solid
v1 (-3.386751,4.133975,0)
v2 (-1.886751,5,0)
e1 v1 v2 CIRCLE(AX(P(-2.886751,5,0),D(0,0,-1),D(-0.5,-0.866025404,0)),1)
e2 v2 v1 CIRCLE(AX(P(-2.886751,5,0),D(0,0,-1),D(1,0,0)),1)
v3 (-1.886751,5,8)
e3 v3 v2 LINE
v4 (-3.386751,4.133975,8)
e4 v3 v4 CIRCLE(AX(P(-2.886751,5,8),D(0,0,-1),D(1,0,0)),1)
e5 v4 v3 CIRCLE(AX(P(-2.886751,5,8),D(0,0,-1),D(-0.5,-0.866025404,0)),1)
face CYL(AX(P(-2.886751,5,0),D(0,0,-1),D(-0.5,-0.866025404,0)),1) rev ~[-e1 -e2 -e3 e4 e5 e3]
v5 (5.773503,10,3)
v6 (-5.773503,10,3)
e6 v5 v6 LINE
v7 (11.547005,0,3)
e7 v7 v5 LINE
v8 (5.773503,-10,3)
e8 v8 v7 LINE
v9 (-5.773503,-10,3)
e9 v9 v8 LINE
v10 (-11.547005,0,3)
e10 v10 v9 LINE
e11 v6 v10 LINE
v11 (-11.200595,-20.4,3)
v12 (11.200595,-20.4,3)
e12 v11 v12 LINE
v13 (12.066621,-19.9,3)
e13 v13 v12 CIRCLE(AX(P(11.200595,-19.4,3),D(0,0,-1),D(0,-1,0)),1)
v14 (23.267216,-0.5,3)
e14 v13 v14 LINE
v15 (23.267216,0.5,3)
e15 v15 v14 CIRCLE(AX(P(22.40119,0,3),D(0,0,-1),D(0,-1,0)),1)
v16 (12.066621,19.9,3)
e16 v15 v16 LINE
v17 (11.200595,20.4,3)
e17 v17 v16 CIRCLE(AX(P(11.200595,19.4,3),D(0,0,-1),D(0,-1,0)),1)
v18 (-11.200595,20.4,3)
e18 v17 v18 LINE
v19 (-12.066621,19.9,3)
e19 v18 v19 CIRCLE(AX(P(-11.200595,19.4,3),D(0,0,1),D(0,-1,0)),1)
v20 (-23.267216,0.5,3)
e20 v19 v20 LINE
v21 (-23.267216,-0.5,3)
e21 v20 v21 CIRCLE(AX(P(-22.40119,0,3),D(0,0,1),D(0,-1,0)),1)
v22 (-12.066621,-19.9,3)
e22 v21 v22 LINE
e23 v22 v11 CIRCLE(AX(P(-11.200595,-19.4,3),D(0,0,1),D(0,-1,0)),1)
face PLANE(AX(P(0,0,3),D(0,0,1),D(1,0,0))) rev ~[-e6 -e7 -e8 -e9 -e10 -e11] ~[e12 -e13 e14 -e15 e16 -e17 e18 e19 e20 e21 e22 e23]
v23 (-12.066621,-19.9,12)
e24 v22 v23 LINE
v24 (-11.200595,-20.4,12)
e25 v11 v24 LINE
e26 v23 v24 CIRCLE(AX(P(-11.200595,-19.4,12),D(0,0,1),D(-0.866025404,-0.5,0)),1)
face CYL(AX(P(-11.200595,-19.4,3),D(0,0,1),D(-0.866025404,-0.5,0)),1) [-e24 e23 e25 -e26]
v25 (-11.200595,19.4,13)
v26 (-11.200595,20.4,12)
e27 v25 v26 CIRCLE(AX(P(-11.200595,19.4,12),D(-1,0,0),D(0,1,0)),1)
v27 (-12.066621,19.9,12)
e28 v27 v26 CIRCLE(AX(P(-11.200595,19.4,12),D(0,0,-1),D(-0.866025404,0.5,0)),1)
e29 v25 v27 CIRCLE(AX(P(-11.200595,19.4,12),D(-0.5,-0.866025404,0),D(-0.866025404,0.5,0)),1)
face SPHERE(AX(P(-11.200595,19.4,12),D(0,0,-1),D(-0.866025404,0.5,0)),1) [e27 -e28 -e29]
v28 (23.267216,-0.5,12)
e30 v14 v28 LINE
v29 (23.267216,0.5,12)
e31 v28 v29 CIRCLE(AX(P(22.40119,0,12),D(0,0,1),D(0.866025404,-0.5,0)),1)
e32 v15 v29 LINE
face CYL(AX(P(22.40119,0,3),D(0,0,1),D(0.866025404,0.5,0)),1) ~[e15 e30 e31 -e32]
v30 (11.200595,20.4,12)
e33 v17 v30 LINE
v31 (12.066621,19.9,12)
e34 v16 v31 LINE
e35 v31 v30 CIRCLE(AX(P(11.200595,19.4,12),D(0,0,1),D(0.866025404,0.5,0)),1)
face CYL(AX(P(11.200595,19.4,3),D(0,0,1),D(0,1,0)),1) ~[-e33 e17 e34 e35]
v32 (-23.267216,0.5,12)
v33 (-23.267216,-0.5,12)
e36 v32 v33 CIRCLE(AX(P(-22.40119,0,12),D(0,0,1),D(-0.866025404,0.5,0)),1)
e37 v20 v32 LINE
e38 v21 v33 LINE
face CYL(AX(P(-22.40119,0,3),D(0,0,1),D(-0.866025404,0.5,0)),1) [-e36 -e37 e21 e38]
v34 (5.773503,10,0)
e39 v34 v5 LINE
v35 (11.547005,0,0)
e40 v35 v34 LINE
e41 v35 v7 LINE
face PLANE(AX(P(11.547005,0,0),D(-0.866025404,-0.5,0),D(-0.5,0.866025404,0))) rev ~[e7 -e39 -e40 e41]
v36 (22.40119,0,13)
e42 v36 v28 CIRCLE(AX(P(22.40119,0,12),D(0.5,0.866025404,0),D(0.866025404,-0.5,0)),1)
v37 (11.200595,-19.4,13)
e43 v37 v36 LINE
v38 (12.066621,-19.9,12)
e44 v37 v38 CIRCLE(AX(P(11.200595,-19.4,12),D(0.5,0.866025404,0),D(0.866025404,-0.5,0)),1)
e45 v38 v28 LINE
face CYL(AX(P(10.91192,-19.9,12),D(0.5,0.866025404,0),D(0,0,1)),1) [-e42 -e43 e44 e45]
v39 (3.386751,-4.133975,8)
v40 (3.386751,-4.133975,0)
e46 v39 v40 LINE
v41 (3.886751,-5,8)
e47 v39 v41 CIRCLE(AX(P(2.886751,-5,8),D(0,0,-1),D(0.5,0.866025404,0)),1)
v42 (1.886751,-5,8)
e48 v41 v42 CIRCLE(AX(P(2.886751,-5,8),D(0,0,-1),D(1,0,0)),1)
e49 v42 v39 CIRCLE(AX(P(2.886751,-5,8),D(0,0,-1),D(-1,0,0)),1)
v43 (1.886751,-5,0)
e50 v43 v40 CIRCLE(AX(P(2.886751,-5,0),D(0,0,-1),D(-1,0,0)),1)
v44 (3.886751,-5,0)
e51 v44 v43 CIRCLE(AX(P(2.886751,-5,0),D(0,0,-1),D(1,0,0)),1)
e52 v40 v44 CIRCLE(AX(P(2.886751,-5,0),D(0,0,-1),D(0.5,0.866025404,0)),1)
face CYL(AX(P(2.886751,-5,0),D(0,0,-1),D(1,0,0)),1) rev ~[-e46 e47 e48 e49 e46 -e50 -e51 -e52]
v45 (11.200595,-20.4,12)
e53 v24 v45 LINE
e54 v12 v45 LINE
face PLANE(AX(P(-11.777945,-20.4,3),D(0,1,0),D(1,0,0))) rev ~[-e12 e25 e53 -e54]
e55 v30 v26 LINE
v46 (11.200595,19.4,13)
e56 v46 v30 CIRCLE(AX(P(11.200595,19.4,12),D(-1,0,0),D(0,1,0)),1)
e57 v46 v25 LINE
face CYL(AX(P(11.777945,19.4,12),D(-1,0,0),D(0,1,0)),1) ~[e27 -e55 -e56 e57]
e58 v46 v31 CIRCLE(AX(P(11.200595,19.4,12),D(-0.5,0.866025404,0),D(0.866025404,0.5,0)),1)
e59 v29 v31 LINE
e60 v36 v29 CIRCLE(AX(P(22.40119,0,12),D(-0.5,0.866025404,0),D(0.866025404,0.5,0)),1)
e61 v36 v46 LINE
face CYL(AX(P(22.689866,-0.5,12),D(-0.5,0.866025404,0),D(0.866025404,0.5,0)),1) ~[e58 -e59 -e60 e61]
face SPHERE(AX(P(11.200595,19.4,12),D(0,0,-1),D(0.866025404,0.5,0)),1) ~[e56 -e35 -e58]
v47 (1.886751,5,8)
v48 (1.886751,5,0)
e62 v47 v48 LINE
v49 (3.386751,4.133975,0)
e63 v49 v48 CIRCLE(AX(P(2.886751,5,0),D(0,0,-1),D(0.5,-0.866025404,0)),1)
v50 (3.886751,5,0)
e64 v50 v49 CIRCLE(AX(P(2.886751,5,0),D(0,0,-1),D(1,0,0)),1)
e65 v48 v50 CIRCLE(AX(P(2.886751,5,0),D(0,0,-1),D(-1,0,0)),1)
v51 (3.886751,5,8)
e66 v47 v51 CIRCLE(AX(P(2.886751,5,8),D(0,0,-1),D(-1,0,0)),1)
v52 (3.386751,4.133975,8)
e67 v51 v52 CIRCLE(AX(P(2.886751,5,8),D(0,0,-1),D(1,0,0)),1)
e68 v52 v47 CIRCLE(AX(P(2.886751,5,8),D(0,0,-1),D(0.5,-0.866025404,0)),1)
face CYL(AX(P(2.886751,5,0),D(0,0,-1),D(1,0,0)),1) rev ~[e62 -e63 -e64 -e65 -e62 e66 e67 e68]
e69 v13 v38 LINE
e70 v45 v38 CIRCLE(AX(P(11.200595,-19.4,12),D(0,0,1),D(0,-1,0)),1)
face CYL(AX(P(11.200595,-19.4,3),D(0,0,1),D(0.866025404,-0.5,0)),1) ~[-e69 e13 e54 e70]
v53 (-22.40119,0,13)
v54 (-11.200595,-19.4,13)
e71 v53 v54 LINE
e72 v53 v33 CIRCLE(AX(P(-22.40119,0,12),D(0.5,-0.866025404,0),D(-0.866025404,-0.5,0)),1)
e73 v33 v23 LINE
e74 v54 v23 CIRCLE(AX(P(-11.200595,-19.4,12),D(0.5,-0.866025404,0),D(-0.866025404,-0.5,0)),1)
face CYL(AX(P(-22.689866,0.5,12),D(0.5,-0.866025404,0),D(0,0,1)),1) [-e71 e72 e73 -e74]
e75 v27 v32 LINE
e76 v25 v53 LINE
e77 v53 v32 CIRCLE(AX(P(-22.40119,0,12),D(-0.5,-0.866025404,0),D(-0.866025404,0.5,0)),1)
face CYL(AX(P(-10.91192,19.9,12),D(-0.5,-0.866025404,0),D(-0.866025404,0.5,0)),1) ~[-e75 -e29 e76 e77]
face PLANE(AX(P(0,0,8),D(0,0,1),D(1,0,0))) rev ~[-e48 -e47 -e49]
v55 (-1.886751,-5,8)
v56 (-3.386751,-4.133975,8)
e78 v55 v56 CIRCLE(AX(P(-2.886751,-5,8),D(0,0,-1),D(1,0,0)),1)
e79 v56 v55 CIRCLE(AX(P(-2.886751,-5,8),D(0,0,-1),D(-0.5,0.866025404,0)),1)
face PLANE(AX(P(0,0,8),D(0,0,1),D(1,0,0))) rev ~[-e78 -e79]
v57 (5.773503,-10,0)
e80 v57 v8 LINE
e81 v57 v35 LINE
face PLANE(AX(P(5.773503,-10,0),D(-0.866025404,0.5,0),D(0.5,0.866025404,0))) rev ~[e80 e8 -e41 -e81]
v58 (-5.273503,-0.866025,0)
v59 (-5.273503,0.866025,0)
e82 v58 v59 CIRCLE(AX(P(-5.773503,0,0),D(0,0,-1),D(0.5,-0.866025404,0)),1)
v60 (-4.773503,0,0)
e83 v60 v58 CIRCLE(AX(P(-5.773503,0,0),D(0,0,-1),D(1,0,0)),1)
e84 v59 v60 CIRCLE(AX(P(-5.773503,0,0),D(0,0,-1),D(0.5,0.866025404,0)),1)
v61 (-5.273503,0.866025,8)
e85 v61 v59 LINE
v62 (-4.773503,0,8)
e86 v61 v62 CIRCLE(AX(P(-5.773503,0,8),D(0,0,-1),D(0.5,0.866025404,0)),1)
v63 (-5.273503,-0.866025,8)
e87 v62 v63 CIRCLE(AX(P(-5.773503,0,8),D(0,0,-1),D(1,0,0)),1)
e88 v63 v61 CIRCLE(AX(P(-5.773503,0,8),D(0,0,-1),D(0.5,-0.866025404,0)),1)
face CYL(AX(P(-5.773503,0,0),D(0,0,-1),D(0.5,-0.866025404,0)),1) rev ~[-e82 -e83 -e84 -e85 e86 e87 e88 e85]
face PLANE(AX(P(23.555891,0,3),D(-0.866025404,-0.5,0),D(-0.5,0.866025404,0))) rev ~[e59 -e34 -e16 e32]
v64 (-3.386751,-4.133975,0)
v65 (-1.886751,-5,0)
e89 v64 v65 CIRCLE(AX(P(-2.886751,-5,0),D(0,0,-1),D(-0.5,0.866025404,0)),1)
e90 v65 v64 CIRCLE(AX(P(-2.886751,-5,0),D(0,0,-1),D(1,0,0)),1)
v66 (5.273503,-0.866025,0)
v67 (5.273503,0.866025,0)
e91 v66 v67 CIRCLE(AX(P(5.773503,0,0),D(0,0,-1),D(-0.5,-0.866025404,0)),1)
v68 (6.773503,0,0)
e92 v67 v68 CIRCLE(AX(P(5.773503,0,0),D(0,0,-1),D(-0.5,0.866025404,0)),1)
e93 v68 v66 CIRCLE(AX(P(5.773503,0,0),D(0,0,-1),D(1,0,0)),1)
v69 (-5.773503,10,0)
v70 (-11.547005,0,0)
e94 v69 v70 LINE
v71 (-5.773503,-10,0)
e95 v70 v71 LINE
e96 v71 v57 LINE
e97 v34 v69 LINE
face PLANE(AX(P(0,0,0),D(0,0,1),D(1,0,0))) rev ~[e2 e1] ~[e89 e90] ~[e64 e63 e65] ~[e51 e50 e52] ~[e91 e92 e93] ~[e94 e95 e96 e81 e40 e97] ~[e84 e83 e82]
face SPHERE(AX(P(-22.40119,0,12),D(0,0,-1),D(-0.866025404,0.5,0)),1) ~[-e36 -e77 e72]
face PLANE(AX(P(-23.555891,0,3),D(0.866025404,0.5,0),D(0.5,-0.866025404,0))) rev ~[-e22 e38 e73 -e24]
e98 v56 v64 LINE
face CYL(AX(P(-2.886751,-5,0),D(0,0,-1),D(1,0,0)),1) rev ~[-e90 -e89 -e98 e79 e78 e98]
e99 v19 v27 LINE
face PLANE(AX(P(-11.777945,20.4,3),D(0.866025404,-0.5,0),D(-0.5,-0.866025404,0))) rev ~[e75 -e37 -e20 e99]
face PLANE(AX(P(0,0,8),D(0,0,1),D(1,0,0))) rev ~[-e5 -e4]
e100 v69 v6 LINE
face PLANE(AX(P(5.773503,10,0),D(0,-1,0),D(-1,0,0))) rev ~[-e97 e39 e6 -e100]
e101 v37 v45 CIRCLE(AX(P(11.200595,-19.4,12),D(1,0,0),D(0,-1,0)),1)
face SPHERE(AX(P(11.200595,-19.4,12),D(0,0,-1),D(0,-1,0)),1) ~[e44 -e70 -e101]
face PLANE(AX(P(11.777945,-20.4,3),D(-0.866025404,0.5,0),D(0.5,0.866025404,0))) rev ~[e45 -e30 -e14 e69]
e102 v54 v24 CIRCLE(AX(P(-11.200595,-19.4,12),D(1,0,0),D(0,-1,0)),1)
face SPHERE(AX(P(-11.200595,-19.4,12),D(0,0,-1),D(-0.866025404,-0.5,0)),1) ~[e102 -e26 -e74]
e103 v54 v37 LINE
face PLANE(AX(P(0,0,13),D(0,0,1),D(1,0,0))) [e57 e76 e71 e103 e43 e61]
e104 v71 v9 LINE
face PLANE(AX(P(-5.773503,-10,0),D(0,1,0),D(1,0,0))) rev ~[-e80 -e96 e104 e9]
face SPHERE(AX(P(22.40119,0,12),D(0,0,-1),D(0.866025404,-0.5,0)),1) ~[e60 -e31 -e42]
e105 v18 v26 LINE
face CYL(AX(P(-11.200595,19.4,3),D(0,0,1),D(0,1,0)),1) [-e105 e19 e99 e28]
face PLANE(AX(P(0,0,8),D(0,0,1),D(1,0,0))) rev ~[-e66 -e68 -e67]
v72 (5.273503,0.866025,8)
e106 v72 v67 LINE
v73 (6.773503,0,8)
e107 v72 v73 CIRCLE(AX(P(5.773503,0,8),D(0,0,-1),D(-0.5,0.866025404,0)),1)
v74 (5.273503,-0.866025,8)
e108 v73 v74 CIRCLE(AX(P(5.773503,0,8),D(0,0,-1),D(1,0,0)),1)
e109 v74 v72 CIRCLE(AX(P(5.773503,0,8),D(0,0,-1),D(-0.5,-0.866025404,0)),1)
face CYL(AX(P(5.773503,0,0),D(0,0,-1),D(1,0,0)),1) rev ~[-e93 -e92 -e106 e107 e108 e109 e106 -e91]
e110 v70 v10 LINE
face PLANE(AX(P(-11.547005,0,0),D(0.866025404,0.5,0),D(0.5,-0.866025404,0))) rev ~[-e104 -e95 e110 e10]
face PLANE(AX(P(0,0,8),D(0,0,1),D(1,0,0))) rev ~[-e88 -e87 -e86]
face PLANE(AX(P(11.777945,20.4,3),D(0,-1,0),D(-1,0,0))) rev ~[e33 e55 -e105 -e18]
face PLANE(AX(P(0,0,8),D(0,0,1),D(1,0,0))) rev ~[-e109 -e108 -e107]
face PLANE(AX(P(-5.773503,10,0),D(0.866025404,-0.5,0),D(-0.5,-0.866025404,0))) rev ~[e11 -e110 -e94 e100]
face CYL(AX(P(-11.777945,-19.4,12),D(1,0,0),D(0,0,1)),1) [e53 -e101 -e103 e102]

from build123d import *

# Parameters (mm, degrees)
F1_DEPTH = 3
F3_DEPTH = 10
F4_R     = 1
F5_DEPTH = 5


with BuildPart() as f1:
    # F0 (on Top) → F1 (new body)
    with BuildSketch(Plane.XY):
        Polygon((5.7735026919, 10), (-5.7735026919, 10), (-11.5470053838, 0), (-5.7735026919, -10), (5.7735026919, -10), (11.5470053838, 0), align=None)
        with BuildLine():
            ThreePointArc((-3.3867513459, 4.1339745962), (-3.3867513459, 5.8660254038), (-1.8867513459, 5))
            Line((-1.8867513459, 5), (1.8867513459, 5))
            ThreePointArc((1.8867513459, 5), (2.8867513459, 6), (3.8867513459, 5))
            ThreePointArc((3.8867513459, 5), (3.7527767497, 4.5), (3.3867513459, 4.1339745962))
            Line((3.3867513459, 4.1339745962), (5.2735026919, 0.8660254038))
            ThreePointArc((5.2735026919, 0.8660254038), (6.2735026919, 0.8660254038), (6.7735026919, 0))
            ThreePointArc((6.7735026919, 0), (6.2735026919, -0.8660254038), (5.2735026919, -0.8660254038))
            Line((5.2735026919, -0.8660254038), (3.3867513459, -4.1339745962))
            ThreePointArc((3.3867513459, -4.1339745962), (3.7527767497, -4.5), (3.8867513459, -5))
            ThreePointArc((3.8867513459, -5), (2.8867513459, -6), (1.8867513459, -5))
            Line((1.8867513459, -5), (-1.8867513459, -5))
            ThreePointArc((-1.8867513459, -5), (-3.3867513459, -5.8660254038), (-3.3867513459, -4.1339745962))
            Line((-3.3867513459, -4.1339745962), (-5.2735026919, -0.8660254038))
            ThreePointArc((-5.2735026919, -0.8660254038), (-6.7735026919, 0), (-5.2735026919, 0.8660254038))
            Line((-5.2735026919, 0.8660254038), (-3.3867513459, 4.1339745962))
        make_face(mode=Mode.SUBTRACT)
        with BuildLine():
            Line((1.8867513459, 5), (-1.8867513459, 5))
            ThreePointArc((-1.8867513459, 5), (-2.3867513459, 4.1339745962), (-3.3867513459, 4.1339745962))
            Line((-3.3867513459, 4.1339745962), (-5.2735026919, 0.8660254038))
            ThreePointArc((-5.2735026919, 0.8660254038), (-4.9074772881, 0.5), (-4.7735026919, 0))
            ThreePointArc((-4.7735026919, 0), (-4.9074772881, -0.5), (-5.2735026919, -0.8660254038))
            Line((-5.2735026919, -0.8660254038), (-3.3867513459, -4.1339745962))
            ThreePointArc((-3.3867513459, -4.1339745962), (-2.3867513459, -4.1339745962), (-1.8867513459, -5))
            Line((-1.8867513459, -5), (1.8867513459, -5))
            ThreePointArc((1.8867513459, -5), (2.3867513459, -4.1339745962), (3.3867513459, -4.1339745962))
            Line((3.3867513459, -4.1339745962), (5.2735026919, -0.8660254038))
            ThreePointArc((5.2735026919, -0.8660254038), (4.7735026919, 0), (5.2735026919, 0.8660254038))
            Line((5.2735026919, 0.8660254038), (3.3867513459, 4.1339745962))
            ThreePointArc((3.3867513459, 4.1339745962), (2.3867513459, 4.1339745962), (1.8867513459, 5))
        make_face()
    extrude(amount=F1_DEPTH)

    # F2 (on face) → F3 (join)
    with BuildSketch(Plane.XY.offset(3)):
        Polygon((11.7779454915, 20.4), (-11.7779454915, 20.4), (-23.5558909829, 0), (-11.7779454915, -20.4), (11.7779454915, -20.4), (23.5558909829, 0), align=None)
        Polygon((5.7735026919, 10), (11.5470053838, 0), (5.7735026919, -10), (-5.7735026919, -10), (-11.5470053838, 0), (-5.7735026919, 10), align=None, mode=Mode.SUBTRACT)
        Polygon((11.7779454915, 20.4), (-11.7779454915, 20.4), (-23.5558909829, 0), (-11.7779454915, -20.4), (11.7779454915, -20.4), (23.5558909829, 0), align=None)
    extrude(amount=F3_DEPTH)

    # F4
    f4_edges = [f1.edges().sort_by_distance(p)[0] for p in [
        (-17.666918, 10.2, 13),
        (-17.666918, -10.2, 13),
        (0, -20.4, 13),
        (17.666918, -10.2, 13),
        (17.666918, 10.2, 13),
        (0, 20.4, 13),
        (-11.777945, 20.4, 8),
        (11.777945, 20.4, 8),
        (23.555891, 0, 8),
        (-23.555891, 0, 8),
        (11.777945, -20.4, 8),
        (-11.777945, -20.4, 8),
    ]]
    fillet(f4_edges, radius=F4_R)

    # F5 (cut): faces of the model
    f5_faces = [f1.faces().sort_by_distance(p)[0] for p in [
        (-2.8867513459, -5, 3),
        (2.8867513459, -5, 3),
        (5.7735026919, 0, 3),
        (2.8867513459, 5, 3),
        (-2.8867513459, 5, 3),
        (-5.7735026919, 0, 3),
    ]]
    extrude(f5_faces, amount=-F5_DEPTH, mode=Mode.SUBTRACT)


solid = f1.part
